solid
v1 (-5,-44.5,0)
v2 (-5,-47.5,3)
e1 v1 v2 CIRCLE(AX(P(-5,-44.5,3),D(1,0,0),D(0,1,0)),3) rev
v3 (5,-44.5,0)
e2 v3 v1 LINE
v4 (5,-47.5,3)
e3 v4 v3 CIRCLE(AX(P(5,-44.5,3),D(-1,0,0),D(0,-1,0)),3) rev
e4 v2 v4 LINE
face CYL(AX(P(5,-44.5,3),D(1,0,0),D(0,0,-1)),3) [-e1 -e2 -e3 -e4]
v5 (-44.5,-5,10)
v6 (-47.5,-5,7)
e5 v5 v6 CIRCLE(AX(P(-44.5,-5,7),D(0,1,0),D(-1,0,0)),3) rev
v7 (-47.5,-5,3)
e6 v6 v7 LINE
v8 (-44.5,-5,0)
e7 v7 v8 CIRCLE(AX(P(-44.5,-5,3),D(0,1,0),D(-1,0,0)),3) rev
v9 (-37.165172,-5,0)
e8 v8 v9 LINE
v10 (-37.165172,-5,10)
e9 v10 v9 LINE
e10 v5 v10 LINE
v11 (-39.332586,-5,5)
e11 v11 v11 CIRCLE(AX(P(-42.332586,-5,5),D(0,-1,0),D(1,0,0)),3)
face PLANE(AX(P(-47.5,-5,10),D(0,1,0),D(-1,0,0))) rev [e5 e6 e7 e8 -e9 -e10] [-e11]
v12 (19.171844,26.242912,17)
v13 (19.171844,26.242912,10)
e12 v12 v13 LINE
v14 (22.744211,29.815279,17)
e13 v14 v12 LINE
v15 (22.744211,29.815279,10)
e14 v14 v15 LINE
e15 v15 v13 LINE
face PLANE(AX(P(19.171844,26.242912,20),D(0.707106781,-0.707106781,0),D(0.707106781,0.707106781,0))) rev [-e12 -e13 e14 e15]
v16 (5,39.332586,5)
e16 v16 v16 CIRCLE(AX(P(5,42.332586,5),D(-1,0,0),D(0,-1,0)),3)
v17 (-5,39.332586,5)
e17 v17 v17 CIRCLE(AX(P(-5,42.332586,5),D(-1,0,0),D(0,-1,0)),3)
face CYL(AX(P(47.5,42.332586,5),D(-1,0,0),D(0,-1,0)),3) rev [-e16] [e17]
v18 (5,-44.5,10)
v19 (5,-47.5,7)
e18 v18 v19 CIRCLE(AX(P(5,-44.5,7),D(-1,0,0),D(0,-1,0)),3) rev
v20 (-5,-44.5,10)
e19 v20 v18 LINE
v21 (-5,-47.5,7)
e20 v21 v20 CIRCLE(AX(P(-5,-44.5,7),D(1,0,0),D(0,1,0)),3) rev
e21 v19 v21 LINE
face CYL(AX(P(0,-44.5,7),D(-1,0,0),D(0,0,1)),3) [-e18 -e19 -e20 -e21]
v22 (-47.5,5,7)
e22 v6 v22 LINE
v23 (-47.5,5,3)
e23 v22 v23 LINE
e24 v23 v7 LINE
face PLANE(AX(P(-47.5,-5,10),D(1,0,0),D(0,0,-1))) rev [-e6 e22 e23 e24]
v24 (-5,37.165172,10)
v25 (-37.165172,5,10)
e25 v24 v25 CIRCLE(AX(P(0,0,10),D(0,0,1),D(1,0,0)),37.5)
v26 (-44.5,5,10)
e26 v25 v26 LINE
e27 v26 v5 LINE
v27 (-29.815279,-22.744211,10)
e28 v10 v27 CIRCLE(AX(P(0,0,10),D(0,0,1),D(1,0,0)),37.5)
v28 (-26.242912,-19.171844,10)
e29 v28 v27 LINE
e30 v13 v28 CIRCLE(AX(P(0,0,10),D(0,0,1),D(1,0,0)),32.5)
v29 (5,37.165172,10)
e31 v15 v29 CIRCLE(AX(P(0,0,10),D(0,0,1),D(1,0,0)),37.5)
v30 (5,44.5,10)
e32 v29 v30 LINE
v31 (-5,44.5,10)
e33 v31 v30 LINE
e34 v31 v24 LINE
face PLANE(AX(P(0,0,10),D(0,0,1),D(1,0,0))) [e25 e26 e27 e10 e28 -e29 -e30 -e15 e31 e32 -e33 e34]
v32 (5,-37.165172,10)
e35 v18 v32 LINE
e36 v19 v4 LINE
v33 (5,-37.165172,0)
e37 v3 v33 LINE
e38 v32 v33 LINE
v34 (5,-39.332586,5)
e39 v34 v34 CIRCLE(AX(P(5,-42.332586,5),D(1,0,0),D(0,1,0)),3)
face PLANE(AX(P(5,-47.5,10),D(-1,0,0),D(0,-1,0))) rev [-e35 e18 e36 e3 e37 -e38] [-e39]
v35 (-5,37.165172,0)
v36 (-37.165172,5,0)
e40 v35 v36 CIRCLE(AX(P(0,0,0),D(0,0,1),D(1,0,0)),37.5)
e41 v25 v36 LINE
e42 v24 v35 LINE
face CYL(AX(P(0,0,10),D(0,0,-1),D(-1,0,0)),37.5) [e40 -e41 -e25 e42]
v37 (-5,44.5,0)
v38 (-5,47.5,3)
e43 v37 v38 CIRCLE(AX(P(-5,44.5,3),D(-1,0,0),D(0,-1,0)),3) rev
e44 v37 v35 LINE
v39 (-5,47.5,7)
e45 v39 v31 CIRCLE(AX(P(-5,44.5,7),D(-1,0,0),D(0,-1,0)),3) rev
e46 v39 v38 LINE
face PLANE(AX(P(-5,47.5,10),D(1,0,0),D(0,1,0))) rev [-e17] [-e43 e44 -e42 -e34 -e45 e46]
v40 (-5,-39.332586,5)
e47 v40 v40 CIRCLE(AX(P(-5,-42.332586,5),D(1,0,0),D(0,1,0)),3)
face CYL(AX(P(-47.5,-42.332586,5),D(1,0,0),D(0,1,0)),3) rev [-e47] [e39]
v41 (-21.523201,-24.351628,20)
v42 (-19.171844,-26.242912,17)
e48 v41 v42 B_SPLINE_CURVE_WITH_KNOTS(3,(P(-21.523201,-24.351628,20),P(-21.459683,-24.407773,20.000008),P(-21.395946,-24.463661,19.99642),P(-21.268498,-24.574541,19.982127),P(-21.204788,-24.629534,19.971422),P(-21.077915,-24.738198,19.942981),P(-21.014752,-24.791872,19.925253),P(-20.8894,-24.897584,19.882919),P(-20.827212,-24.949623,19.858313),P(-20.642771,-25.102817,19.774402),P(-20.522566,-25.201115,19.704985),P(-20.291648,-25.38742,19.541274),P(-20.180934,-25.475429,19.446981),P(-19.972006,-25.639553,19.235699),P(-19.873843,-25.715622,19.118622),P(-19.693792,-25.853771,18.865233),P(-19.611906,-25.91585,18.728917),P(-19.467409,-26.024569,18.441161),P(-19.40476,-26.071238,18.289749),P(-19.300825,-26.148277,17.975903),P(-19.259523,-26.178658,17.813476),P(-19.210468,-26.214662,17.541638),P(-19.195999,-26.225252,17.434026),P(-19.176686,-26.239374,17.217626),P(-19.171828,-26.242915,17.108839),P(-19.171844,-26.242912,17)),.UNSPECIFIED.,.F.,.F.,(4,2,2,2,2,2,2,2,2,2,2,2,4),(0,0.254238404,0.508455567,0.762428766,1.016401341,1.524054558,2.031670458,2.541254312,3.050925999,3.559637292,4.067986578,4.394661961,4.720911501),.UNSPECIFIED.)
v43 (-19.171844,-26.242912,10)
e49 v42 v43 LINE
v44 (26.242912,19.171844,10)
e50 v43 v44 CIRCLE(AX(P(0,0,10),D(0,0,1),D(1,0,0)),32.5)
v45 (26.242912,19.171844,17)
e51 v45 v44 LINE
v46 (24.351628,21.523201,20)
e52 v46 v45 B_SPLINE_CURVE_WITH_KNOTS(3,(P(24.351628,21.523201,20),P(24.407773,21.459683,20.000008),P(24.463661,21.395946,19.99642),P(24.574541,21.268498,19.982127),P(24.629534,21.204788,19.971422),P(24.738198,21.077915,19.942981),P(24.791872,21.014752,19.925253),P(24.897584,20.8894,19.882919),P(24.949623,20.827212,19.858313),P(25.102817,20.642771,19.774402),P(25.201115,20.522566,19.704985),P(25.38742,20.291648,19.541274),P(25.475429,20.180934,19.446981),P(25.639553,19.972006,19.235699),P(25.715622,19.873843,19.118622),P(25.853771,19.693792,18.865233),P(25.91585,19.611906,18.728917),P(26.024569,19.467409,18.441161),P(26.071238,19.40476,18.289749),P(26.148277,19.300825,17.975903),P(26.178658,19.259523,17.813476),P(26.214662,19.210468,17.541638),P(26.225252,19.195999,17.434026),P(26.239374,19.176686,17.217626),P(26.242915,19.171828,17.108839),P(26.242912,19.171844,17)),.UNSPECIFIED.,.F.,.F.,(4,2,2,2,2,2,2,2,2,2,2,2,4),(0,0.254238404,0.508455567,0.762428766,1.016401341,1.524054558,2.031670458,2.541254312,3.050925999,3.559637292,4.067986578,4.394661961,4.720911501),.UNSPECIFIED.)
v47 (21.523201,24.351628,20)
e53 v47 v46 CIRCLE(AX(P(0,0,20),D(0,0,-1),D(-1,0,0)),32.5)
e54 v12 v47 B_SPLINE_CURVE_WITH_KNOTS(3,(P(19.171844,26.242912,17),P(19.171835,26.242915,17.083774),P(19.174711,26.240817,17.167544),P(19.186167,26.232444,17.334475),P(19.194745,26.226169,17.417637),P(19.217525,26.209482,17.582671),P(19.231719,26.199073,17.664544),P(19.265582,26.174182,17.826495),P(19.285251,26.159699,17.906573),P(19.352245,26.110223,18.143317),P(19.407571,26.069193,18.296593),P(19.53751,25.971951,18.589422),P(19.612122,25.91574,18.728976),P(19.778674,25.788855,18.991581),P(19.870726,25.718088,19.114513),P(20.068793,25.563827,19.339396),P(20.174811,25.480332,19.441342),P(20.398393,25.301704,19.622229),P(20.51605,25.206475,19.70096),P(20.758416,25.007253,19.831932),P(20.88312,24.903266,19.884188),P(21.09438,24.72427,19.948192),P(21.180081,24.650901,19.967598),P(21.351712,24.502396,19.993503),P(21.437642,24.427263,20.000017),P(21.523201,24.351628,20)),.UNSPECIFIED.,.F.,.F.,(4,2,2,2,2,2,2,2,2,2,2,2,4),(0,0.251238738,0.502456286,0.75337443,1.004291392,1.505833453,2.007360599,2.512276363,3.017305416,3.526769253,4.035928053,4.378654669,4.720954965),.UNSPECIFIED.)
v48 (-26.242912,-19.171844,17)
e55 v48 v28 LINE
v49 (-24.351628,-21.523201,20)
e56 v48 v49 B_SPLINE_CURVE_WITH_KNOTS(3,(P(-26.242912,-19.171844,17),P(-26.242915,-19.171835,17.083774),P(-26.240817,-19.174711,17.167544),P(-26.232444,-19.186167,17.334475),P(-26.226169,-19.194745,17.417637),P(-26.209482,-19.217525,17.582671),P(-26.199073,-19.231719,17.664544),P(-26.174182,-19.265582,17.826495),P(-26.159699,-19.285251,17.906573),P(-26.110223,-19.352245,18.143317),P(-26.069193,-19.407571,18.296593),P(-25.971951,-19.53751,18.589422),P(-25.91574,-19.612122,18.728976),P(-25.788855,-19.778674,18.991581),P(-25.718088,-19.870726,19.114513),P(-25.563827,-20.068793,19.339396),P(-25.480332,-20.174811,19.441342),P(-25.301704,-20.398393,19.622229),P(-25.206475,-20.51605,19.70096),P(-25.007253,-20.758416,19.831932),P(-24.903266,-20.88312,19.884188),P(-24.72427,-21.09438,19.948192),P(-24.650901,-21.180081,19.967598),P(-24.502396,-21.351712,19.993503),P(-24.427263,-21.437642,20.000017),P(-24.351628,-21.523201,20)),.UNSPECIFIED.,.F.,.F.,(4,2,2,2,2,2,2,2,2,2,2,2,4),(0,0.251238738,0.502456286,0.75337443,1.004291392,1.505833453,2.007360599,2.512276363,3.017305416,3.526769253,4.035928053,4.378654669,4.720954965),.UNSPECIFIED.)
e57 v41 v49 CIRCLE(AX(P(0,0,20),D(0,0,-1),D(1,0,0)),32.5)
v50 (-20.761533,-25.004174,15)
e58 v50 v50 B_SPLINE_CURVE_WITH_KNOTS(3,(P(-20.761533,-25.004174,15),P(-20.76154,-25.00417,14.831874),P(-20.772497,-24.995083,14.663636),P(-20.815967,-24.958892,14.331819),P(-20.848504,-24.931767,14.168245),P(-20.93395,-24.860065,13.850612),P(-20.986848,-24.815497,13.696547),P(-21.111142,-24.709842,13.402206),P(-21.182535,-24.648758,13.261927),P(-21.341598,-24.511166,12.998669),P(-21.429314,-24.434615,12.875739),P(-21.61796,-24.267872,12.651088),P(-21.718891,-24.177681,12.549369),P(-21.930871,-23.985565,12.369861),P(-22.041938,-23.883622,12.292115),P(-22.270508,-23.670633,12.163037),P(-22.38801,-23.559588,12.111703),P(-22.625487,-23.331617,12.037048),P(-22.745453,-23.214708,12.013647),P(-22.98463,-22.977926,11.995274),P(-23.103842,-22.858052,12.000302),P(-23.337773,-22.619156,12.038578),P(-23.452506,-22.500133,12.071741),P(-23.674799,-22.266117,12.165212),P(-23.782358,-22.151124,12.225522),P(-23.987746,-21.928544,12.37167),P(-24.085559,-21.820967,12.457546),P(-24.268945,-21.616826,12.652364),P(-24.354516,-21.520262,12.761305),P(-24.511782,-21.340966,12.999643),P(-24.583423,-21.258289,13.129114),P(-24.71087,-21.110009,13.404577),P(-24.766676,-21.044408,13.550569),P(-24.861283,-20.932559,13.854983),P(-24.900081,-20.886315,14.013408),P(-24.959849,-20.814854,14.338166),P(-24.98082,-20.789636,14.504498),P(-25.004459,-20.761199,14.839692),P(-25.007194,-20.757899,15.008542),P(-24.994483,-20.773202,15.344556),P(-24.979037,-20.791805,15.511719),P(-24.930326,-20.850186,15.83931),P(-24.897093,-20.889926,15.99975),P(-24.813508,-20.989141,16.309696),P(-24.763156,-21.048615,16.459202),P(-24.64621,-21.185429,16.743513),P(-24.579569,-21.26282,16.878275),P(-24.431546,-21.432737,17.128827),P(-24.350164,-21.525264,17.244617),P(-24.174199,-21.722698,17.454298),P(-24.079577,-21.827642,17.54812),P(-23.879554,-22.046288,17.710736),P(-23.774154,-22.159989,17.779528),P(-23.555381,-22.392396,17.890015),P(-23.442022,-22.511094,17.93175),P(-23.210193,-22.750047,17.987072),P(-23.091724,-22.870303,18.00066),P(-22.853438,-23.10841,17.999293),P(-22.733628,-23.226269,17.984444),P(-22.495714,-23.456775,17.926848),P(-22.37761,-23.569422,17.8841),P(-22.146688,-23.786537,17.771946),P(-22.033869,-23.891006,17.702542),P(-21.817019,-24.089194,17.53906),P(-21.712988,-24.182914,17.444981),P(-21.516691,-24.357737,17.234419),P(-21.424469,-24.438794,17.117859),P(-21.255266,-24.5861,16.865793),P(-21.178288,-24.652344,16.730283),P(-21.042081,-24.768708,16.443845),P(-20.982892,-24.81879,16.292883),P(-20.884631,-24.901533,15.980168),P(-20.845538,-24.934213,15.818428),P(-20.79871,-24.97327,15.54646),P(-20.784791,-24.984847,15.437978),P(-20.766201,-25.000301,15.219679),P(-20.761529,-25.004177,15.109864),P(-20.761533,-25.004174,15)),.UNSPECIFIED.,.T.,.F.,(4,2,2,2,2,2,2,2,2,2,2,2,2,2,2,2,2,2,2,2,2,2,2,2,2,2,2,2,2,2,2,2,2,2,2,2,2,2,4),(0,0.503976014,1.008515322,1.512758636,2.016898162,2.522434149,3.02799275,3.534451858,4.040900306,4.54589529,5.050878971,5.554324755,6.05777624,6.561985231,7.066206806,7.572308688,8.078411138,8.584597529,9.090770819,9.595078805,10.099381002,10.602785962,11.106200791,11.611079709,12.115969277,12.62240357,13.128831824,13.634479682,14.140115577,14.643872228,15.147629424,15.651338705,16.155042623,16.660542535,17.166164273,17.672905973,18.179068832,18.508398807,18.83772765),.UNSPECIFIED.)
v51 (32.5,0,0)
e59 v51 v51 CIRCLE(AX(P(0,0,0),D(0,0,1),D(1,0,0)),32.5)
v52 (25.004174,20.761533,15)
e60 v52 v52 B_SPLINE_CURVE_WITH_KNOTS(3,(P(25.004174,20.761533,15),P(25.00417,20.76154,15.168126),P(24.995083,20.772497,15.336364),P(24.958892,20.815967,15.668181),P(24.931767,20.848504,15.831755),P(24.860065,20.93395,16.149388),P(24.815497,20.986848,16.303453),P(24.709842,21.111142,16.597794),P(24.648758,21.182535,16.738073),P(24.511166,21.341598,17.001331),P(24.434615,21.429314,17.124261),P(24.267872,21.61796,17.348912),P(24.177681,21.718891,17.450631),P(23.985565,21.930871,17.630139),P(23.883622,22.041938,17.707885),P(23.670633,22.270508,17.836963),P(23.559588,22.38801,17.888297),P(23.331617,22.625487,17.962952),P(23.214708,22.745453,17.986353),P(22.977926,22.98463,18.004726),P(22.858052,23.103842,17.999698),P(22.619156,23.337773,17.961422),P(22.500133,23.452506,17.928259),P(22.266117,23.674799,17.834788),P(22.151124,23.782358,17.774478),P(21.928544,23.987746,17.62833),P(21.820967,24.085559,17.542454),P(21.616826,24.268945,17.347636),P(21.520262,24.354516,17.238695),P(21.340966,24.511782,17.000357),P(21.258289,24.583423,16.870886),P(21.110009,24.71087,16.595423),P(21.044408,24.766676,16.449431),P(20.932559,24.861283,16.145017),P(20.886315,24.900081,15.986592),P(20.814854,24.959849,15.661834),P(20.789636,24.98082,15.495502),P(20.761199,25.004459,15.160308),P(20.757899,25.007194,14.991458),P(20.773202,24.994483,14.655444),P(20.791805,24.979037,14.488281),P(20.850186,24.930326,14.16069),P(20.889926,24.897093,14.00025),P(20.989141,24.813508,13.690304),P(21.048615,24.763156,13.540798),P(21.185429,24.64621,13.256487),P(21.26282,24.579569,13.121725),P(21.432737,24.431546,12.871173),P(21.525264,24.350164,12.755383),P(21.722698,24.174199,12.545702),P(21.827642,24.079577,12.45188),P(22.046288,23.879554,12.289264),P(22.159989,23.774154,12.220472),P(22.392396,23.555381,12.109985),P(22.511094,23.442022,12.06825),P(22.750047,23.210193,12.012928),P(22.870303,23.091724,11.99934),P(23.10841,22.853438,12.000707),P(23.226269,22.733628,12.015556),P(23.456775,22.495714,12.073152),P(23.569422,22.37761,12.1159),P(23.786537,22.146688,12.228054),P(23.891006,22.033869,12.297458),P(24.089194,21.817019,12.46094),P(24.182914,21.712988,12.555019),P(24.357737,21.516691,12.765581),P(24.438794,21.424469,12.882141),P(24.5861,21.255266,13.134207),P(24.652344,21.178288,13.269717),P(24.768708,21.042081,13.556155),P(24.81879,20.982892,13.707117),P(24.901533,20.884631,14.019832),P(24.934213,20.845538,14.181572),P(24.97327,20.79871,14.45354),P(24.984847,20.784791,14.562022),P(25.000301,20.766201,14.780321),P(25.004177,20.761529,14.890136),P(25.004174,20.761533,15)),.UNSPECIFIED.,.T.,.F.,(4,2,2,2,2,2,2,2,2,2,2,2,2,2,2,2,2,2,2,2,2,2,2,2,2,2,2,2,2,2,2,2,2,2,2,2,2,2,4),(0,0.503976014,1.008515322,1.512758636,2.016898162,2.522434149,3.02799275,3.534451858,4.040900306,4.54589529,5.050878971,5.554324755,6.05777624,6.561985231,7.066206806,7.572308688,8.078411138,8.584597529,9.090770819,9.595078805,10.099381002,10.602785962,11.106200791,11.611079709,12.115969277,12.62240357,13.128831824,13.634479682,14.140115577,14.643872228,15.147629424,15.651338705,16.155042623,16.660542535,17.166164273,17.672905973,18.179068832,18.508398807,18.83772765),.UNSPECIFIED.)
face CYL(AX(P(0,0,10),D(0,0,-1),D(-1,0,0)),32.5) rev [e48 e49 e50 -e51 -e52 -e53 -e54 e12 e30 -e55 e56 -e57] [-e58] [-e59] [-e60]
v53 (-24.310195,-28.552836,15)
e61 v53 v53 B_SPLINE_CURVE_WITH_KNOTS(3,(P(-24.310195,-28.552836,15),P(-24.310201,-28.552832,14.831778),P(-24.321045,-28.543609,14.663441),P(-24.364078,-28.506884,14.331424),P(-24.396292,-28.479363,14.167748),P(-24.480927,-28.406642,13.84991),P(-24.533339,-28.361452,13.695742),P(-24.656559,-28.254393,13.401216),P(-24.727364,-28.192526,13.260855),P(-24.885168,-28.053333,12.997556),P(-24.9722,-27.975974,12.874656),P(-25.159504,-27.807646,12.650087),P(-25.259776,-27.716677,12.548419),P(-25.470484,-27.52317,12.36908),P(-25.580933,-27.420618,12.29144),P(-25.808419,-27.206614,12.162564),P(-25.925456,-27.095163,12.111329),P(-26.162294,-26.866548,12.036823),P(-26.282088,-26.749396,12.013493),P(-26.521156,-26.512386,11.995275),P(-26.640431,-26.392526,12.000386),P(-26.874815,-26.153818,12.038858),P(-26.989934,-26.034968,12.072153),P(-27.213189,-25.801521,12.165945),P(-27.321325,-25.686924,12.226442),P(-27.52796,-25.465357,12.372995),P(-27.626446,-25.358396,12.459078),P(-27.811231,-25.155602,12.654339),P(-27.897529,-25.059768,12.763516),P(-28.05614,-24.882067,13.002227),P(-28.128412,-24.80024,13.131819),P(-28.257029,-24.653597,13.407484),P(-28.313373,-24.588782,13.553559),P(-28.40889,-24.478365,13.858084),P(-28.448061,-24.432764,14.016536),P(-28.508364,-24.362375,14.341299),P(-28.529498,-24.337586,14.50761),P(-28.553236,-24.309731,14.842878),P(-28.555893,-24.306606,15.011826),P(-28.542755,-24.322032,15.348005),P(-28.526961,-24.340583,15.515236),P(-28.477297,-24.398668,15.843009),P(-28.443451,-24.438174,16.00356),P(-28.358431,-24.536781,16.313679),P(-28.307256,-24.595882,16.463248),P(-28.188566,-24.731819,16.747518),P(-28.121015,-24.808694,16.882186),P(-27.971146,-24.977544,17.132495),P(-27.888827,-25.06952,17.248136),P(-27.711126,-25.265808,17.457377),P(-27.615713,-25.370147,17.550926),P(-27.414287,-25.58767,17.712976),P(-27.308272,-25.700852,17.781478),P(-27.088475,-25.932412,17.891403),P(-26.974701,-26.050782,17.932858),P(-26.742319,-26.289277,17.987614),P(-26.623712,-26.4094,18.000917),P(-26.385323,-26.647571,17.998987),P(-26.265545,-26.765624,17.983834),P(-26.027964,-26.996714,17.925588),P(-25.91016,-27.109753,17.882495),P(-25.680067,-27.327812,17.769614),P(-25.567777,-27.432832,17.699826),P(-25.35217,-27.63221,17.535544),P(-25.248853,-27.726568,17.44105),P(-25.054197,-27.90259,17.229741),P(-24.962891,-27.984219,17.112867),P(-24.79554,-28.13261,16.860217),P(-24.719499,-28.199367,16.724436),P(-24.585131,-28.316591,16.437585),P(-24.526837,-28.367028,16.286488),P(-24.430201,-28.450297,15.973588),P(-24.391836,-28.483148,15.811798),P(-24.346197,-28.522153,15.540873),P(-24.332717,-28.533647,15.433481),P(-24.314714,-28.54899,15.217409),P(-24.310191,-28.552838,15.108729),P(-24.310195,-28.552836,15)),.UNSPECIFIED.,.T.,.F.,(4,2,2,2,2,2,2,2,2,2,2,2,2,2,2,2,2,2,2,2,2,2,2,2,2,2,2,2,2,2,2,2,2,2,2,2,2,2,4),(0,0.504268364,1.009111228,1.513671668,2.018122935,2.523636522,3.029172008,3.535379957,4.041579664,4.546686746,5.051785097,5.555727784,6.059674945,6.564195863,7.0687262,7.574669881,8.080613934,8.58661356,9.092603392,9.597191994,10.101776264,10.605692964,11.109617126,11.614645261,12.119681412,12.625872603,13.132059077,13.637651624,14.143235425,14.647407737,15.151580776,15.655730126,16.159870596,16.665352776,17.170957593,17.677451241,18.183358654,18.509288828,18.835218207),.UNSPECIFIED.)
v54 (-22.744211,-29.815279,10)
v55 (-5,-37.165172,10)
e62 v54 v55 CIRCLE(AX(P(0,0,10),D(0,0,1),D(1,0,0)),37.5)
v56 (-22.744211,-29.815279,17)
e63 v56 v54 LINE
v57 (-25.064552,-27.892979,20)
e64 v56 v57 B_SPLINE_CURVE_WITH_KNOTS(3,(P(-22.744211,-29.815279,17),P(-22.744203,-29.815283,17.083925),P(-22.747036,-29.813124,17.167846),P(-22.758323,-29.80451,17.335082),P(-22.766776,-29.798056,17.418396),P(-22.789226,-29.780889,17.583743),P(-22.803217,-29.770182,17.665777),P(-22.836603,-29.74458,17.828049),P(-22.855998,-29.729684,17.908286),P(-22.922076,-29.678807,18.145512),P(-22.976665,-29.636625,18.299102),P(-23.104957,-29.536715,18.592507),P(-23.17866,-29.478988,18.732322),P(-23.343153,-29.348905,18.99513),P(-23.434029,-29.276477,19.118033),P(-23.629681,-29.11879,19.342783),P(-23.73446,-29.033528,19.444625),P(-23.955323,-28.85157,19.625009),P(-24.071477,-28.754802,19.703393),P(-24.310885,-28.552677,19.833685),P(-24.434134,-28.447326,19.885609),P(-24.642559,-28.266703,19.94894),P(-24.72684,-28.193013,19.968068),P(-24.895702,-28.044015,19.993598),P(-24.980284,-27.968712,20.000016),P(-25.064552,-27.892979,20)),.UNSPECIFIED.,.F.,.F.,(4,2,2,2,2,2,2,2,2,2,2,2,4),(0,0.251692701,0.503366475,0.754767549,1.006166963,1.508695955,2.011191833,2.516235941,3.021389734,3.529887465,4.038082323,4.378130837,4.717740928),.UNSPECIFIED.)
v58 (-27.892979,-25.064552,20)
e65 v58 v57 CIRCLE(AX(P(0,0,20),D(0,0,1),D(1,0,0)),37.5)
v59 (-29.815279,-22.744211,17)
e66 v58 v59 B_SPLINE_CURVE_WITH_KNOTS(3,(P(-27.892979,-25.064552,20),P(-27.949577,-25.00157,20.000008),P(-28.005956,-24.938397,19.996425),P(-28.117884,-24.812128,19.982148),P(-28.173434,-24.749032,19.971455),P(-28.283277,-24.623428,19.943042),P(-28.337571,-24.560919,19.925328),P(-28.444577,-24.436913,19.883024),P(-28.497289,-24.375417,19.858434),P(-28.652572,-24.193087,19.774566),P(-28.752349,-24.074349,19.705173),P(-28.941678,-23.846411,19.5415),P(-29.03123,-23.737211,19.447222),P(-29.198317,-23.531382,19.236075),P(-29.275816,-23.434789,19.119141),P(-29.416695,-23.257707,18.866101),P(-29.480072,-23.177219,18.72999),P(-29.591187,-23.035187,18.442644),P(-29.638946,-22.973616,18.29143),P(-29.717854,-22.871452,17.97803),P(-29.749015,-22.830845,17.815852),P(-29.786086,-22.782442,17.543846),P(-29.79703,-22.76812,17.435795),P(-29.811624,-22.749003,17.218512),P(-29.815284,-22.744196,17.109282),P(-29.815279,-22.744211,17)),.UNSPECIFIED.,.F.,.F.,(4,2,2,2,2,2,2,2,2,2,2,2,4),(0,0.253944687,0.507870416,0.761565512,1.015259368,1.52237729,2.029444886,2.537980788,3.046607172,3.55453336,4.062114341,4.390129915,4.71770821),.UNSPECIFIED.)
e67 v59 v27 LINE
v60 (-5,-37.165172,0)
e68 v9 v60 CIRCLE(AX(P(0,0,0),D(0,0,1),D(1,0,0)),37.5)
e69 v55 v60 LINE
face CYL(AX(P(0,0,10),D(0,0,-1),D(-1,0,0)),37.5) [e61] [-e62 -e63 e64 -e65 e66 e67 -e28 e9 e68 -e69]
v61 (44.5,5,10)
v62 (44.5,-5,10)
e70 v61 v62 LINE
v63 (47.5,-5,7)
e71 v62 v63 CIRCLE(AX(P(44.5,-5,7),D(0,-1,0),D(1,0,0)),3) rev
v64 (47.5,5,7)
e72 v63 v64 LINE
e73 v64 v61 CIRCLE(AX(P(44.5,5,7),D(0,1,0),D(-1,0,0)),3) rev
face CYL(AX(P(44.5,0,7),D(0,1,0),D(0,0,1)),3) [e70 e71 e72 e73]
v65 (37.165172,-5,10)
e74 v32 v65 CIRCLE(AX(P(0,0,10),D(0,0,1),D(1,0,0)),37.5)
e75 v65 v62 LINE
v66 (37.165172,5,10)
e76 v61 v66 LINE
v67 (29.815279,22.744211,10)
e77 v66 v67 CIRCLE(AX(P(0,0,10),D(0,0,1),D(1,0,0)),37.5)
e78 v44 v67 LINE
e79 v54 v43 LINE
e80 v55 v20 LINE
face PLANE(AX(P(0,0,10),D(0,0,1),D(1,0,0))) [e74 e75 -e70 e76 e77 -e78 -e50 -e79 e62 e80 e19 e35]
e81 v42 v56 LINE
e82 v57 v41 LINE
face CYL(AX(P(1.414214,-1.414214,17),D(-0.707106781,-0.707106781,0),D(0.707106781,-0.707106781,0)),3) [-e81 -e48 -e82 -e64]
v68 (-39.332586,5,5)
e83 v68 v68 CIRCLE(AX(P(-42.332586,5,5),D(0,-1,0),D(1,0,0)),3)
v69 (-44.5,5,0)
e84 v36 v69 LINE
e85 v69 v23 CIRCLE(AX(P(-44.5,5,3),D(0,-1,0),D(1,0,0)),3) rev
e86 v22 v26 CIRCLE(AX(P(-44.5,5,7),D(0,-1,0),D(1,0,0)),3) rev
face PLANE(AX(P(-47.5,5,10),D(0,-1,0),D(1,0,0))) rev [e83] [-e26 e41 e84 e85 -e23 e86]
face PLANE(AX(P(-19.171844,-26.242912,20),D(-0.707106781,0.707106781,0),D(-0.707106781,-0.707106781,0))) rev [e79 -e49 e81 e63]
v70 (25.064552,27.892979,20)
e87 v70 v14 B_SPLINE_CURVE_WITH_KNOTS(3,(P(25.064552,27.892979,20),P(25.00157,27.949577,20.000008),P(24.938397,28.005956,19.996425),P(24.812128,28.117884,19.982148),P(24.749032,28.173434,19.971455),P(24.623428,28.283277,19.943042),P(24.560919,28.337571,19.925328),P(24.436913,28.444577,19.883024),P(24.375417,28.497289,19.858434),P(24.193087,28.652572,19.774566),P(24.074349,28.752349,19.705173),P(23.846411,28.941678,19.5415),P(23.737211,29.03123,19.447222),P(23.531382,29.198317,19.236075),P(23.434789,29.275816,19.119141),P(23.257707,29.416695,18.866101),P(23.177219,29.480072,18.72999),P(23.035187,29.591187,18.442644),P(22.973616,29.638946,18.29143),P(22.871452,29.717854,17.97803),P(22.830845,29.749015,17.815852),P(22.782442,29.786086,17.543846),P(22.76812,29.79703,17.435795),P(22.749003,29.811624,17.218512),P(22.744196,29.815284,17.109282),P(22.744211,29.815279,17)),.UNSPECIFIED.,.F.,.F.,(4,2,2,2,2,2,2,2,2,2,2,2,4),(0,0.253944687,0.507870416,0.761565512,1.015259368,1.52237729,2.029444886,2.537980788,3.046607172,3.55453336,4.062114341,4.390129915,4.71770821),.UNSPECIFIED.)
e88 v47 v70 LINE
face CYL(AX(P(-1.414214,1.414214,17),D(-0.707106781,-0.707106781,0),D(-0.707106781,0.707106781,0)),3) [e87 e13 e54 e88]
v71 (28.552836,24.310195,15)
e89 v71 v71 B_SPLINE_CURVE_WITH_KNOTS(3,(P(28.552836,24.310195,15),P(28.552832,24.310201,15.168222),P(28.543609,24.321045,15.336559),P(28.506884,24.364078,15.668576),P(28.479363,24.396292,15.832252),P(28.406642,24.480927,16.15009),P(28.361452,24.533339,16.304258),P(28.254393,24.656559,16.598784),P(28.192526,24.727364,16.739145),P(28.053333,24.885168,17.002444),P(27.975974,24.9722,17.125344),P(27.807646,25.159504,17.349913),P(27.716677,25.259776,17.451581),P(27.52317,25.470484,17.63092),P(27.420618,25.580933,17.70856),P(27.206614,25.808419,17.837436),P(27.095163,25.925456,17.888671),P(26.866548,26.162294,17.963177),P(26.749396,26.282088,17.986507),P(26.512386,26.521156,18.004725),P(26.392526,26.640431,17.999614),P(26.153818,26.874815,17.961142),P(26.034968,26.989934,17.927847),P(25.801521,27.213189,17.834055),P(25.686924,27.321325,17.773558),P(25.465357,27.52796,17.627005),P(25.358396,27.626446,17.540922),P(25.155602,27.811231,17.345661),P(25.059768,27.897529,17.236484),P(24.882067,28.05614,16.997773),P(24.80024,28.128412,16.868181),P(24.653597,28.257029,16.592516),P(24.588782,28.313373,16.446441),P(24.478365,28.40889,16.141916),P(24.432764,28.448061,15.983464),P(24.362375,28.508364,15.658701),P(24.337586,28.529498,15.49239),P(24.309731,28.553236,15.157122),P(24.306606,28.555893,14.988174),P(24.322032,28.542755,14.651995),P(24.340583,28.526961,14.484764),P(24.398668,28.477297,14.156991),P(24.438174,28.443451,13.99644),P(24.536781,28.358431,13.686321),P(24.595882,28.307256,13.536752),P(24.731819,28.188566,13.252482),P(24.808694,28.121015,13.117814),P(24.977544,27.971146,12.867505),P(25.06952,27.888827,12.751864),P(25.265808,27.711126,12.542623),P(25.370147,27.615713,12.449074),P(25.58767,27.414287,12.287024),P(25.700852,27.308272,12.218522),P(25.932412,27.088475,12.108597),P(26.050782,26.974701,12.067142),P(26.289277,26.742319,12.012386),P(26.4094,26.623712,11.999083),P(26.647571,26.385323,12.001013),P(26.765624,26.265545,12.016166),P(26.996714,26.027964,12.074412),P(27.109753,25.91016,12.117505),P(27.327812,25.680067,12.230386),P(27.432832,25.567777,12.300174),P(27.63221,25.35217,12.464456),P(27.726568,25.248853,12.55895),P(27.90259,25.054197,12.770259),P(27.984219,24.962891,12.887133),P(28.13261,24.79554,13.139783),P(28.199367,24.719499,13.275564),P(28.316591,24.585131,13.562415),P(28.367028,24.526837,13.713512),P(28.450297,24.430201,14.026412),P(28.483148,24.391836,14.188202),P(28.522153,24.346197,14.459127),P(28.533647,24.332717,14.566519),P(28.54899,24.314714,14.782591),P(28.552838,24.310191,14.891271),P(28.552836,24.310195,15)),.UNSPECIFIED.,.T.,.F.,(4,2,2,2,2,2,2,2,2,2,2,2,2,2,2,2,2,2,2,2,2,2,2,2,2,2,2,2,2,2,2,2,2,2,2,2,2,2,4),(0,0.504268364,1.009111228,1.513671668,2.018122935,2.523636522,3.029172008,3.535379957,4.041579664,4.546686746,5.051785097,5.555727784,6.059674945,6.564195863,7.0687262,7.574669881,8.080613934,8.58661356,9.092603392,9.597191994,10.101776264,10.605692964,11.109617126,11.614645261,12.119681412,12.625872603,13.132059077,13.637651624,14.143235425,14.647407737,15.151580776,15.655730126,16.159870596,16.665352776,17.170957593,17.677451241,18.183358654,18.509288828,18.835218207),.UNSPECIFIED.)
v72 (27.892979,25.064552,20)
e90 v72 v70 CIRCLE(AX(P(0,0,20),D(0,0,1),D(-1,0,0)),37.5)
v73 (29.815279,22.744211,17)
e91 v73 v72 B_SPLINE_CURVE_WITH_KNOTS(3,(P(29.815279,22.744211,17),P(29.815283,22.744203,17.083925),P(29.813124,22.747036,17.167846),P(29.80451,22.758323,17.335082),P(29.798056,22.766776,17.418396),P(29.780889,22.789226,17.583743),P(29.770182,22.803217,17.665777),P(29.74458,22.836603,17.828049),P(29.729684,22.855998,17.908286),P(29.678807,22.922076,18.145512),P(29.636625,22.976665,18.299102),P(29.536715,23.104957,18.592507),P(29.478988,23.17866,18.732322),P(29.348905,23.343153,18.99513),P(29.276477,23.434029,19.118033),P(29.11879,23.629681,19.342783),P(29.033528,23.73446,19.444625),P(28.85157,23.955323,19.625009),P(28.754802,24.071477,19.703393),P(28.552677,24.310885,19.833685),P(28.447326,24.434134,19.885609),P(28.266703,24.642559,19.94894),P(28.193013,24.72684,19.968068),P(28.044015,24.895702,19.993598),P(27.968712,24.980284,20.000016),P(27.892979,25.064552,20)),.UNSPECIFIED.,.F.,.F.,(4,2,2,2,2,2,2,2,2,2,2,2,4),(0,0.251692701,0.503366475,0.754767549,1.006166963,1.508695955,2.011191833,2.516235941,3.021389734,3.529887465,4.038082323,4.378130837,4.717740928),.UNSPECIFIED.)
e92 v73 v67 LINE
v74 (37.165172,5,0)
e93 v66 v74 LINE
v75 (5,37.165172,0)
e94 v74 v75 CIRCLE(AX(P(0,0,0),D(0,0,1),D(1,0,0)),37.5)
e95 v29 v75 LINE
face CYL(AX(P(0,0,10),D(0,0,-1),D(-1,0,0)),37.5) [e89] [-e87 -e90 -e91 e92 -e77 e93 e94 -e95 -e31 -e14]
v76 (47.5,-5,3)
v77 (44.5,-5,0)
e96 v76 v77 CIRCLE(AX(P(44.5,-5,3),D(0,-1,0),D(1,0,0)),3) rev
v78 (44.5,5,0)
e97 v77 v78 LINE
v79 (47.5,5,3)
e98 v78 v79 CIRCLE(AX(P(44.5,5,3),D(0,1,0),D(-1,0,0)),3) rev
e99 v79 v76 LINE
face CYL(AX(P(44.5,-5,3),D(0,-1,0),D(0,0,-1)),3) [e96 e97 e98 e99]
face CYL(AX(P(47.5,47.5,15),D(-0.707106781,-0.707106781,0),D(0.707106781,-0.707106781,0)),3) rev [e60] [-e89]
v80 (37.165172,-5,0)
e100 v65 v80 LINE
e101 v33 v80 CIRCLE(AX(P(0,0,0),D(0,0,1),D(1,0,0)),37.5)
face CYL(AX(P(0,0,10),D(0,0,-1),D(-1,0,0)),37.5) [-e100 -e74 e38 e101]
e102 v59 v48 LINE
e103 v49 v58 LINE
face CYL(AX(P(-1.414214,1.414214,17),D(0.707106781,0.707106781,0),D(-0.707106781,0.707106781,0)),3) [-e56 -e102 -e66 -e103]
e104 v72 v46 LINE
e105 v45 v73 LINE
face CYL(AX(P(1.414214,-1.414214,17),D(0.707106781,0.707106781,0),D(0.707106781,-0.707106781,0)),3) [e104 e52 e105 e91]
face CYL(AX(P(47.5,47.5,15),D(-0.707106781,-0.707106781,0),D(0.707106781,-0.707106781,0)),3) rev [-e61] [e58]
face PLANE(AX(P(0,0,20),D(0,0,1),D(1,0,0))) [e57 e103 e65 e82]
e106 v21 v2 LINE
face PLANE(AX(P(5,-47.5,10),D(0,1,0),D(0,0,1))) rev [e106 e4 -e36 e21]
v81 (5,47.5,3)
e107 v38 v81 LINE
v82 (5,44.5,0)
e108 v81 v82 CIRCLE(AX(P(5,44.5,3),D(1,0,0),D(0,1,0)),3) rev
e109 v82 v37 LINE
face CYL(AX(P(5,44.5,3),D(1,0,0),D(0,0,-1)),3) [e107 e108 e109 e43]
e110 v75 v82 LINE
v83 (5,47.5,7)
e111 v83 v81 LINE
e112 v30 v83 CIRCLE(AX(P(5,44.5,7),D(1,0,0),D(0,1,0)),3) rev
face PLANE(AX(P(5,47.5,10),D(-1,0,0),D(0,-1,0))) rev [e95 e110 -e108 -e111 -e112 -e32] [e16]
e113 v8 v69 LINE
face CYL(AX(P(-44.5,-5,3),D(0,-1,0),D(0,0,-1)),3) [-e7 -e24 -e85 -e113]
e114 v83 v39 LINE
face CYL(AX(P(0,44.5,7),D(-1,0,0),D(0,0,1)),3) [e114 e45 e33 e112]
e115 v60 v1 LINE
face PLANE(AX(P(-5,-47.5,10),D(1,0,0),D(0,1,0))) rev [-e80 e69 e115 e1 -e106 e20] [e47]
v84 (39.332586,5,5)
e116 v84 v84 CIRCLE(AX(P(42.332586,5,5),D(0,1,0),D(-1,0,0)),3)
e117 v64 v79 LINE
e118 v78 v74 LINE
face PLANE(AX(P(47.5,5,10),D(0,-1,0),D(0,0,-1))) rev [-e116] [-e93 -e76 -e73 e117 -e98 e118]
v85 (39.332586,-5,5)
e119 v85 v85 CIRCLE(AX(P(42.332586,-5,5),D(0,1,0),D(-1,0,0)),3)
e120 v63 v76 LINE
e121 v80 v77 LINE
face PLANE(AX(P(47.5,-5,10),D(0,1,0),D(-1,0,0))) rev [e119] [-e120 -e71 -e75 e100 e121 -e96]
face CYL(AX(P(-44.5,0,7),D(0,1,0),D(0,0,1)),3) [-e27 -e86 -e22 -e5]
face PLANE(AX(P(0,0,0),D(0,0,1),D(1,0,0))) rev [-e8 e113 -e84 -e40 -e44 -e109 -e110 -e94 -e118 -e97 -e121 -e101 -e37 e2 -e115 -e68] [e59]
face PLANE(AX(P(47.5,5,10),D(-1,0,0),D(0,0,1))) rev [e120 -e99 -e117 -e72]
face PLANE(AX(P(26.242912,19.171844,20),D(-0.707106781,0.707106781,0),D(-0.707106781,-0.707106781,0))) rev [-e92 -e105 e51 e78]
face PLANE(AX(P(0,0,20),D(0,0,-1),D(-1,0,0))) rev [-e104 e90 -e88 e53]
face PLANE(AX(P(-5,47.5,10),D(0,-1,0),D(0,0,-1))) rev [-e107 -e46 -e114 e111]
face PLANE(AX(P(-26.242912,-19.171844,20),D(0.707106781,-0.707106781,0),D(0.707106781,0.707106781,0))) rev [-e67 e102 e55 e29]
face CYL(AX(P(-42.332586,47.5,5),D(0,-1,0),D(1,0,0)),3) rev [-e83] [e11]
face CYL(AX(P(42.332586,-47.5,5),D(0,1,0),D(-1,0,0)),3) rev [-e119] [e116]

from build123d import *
from build123d.topology import SkipClean

# Parameters (mm, degrees)
CROQUIS1_R                 = 32.5
SALIENTE_EXTRUIR1_DEPTH    = 10
CROQUIS2_R                 = 3
CORTAR_EXTRUIR1_DEPTH      = 72.50174823
MATRIZC1_COUNT             = 4
SALIENTE_EXTRUIR2_DEPTH    = 10
CORTAR_EXTRUIR2_DEPTH      = 71.089228844
CORTAR_EXTRUIR2_DEPTH_BACK = 71.089228844
CROQUIS4_R                 = 3
REDONDEO1_R                = 3
SIMETR_A3_START            = 32.113081288
SIMETR_A3_DEPTH            = 5.333547499
SIMETR_A3_START_2          = -5
SIMETR_A3_2_DEPTH          = 10
SIMETR_A3_3_DEPTH          = 10


# Read off the part's stored shape, not the designer's step: Simetría3
with BuildPart() as part:
    # Croquis1 → Saliente-Extruir1 (new body)
    with BuildSketch(Plane.XY):
        with BuildLine():
            Line((-5, 47.5), (5, 47.5))
            Line((5, 47.5), (5, 37.165171868))
            ThreePointArc((5, 37.165171868), (26.516504294, 26.516504294), (37.165171868, 5))
            Line((37.165171868, 5), (47.5, 5))
            Line((47.5, 5), (47.5, -5))
            Line((47.5, -5), (37.165171868, -5))
            ThreePointArc((37.165171868, -5), (26.516504294, -26.516504294), (5, -37.165171868))
            Line((5, -37.165171868), (5, -47.5))
            Line((5, -47.5), (-5, -47.5))
            Line((-5, -47.5), (-5, -37.165171868))
            ThreePointArc((-5, -37.165171868), (-26.516504294, -26.516504294), (-37.165171868, -5))
            Line((-37.165171868, -5), (-47.5, -5))
            Line((-47.5, -5), (-47.5, 5))
            Line((-47.5, 5), (-37.165171868, 5))
            ThreePointArc((-37.165171868, 5), (-26.516504294, 26.516504294), (-5, 37.165171868))
            Line((-5, 37.165171868), (-5, 47.5))
        make_face()
        Circle(CROQUIS1_R, mode=Mode.SUBTRACT)
    extrude(amount=SALIENTE_EXTRUIR1_DEPTH)

    # Croquis2 → Cortar-Extruir1 (cut, through all)
    with BuildSketch(Plane(origin=(5, 0, 0), x_dir=(0, 0, -1), z_dir=(1, 0, 0))):
        with Locations(Location((-5, -42.332585934, 0), (0, 0, 90))):
            Circle(CROQUIS2_R)
    cortar_extruir1 = extrude(amount=-CORTAR_EXTRUIR1_DEPTH, mode=Mode.SUBTRACT)

    # MatrizC1: Cortar-Extruir1 ×4 about axis
    matrizc1_axis = Axis((0, 0, 10), (0, 0, 1))
    for i in range(1, MATRIZC1_COUNT):
        add(cortar_extruir1.rotate(matrizc1_axis, i * 360 / MATRIZC1_COUNT), mode=Mode.SUBTRACT)

    # Croquis3 → Saliente-Extruir2 (add)
    with SkipClean():  # the faces are left unmerged after this step: merging them gives an invalid solid
        with BuildSketch(Plane.XY.offset(10)):
            with BuildLine():
                Line((19.17184375, 26.242911562), (22.744211146, 29.815278958))
                ThreePointArc((22.744211146, 29.815278958), (26.516504294, 26.516504294), (29.815278958, 22.744211146))
                Line((29.815278958, 22.744211146), (26.242911562, 19.17184375))
                ThreePointArc((26.242911562, 19.17184375), (22.980970389, 22.980970389), (19.17184375, 26.242911562))
            make_face()
            with BuildLine():
                Line((-26.242911562, -19.17184375), (-29.815278958, -22.744211146))
                ThreePointArc((-29.815278958, -22.744211146), (-26.516504294, -26.516504294), (-22.744211146, -29.815278958))
                Line((-22.744211146, -29.815278958), (-19.17184375, -26.242911562))
                ThreePointArc((-19.17184375, -26.242911562), (-22.980970389, -22.980970389), (-26.242911562, -19.17184375))
            make_face()
        extrude(amount=SALIENTE_EXTRUIR2_DEPTH)

    # Croquis4 → Cortar-Extruir2 (cut, two sides: drawn at the far end of the back side and taken through both)
    with SkipClean():  # the faces are left unmerged after this step: merging them gives an invalid solid
        with BuildSketch(Plane(origin=(0, 0, 0), x_dir=(-0.7071067811865476, 0.7071067811865475, 0), z_dir=(-0.7071067811865475, -0.7071067811865476, 0)).offset(-CORTAR_EXTRUIR2_DEPTH_BACK)):
            with Locations(Location((0, -15, 0), (0, 0, 180))):
                Circle(CROQUIS4_R)
        extrude(amount=CORTAR_EXTRUIR2_DEPTH + CORTAR_EXTRUIR2_DEPTH_BACK, mode=Mode.SUBTRACT)

    # Redondeo1
    redondeo1_edges = [part.edges().sort_by_distance(p)[0] for p in [
        (-47.5, 0, 10),
        (0, -47.5, 0),
        (-47.5, 0, 0),
        (0, -47.5, 10),
        (-28.02909526, -20.958027448, 20),
        (-20.958027448, -28.02909526, 20),
    ]]
    fillet(redondeo1_edges, radius=REDONDEO1_R)

    # Simetría3 outline → Simetría3 (cut)
    with SkipClean():  # the faces are left unmerged after this step: merging them gives an invalid solid
        with BuildSketch(Plane(origin=(0, 0, 0), x_dir=(0.707106781186546, -0.707106781186549, 0), z_dir=(0.707106781186549, 0.707106781186546, 0)).offset(SIMETR_A3_START)):
            with BuildLine():
                Line((-5, -20), (-2, -20))
                ThreePointArc((-2, -20), (-4.121320344, -19.121320344), (-5, -17))
                Line((-5, -17), (-5, -20))
            make_face()
            with BuildLine():
                ThreePointArc((5, -17), (4.121320344, -19.121320344), (2, -20))
                Line((2, -20), (5, -20))
                Line((5, -20), (5, -17))
            make_face()
        extrude(amount=SIMETR_A3_DEPTH, mode=Mode.SUBTRACT)

    # Simetr_a3 2 outline → Simetr_a3 2 (cut)
    with SkipClean():  # the faces are left unmerged after this step: merging them gives an invalid solid
        with BuildSketch(Plane.YZ.offset(SIMETR_A3_START_2)):
            with BuildLine():
                Line((47.5, 10), (44.5, 10))
                ThreePointArc((44.5, 10), (46.621320344, 9.121320344), (47.5, 7))
                Line((47.5, 7), (47.5, 10))
            make_face()
            with BuildLine():
                Line((47.5, 0), (47.5, 3))
                ThreePointArc((47.5, 3), (46.621320344, 0.878679656), (44.5, 0))
                Line((44.5, 0), (47.5, 0))
            make_face()
        extrude(amount=SIMETR_A3_2_DEPTH, mode=Mode.SUBTRACT)

    # Simetr_a3 3 outline → Simetr_a3 3 (cut)
    with SkipClean():  # the faces are left unmerged after this step: merging them gives an invalid solid
        with BuildSketch(Plane(origin=(0, 0, 0), x_dir=(1, 0, 0), z_dir=(0, 1, 0)).offset(SIMETR_A3_START_2)):
            with BuildLine():
                Line((47.5, 0), (44.5, 0))
                ThreePointArc((44.5, 0), (46.621320344, -0.878679656), (47.5, -3))
                Line((47.5, -3), (47.5, 0))
            make_face()
            with BuildLine():
                Line((47.5, -10), (47.5, -7))
                ThreePointArc((47.5, -7), (46.621320344, -9.121320344), (44.5, -10))
                Line((44.5, -10), (47.5, -10))
            make_face()
        extrude(amount=SIMETR_A3_3_DEPTH, mode=Mode.SUBTRACT)


solid = part.part
